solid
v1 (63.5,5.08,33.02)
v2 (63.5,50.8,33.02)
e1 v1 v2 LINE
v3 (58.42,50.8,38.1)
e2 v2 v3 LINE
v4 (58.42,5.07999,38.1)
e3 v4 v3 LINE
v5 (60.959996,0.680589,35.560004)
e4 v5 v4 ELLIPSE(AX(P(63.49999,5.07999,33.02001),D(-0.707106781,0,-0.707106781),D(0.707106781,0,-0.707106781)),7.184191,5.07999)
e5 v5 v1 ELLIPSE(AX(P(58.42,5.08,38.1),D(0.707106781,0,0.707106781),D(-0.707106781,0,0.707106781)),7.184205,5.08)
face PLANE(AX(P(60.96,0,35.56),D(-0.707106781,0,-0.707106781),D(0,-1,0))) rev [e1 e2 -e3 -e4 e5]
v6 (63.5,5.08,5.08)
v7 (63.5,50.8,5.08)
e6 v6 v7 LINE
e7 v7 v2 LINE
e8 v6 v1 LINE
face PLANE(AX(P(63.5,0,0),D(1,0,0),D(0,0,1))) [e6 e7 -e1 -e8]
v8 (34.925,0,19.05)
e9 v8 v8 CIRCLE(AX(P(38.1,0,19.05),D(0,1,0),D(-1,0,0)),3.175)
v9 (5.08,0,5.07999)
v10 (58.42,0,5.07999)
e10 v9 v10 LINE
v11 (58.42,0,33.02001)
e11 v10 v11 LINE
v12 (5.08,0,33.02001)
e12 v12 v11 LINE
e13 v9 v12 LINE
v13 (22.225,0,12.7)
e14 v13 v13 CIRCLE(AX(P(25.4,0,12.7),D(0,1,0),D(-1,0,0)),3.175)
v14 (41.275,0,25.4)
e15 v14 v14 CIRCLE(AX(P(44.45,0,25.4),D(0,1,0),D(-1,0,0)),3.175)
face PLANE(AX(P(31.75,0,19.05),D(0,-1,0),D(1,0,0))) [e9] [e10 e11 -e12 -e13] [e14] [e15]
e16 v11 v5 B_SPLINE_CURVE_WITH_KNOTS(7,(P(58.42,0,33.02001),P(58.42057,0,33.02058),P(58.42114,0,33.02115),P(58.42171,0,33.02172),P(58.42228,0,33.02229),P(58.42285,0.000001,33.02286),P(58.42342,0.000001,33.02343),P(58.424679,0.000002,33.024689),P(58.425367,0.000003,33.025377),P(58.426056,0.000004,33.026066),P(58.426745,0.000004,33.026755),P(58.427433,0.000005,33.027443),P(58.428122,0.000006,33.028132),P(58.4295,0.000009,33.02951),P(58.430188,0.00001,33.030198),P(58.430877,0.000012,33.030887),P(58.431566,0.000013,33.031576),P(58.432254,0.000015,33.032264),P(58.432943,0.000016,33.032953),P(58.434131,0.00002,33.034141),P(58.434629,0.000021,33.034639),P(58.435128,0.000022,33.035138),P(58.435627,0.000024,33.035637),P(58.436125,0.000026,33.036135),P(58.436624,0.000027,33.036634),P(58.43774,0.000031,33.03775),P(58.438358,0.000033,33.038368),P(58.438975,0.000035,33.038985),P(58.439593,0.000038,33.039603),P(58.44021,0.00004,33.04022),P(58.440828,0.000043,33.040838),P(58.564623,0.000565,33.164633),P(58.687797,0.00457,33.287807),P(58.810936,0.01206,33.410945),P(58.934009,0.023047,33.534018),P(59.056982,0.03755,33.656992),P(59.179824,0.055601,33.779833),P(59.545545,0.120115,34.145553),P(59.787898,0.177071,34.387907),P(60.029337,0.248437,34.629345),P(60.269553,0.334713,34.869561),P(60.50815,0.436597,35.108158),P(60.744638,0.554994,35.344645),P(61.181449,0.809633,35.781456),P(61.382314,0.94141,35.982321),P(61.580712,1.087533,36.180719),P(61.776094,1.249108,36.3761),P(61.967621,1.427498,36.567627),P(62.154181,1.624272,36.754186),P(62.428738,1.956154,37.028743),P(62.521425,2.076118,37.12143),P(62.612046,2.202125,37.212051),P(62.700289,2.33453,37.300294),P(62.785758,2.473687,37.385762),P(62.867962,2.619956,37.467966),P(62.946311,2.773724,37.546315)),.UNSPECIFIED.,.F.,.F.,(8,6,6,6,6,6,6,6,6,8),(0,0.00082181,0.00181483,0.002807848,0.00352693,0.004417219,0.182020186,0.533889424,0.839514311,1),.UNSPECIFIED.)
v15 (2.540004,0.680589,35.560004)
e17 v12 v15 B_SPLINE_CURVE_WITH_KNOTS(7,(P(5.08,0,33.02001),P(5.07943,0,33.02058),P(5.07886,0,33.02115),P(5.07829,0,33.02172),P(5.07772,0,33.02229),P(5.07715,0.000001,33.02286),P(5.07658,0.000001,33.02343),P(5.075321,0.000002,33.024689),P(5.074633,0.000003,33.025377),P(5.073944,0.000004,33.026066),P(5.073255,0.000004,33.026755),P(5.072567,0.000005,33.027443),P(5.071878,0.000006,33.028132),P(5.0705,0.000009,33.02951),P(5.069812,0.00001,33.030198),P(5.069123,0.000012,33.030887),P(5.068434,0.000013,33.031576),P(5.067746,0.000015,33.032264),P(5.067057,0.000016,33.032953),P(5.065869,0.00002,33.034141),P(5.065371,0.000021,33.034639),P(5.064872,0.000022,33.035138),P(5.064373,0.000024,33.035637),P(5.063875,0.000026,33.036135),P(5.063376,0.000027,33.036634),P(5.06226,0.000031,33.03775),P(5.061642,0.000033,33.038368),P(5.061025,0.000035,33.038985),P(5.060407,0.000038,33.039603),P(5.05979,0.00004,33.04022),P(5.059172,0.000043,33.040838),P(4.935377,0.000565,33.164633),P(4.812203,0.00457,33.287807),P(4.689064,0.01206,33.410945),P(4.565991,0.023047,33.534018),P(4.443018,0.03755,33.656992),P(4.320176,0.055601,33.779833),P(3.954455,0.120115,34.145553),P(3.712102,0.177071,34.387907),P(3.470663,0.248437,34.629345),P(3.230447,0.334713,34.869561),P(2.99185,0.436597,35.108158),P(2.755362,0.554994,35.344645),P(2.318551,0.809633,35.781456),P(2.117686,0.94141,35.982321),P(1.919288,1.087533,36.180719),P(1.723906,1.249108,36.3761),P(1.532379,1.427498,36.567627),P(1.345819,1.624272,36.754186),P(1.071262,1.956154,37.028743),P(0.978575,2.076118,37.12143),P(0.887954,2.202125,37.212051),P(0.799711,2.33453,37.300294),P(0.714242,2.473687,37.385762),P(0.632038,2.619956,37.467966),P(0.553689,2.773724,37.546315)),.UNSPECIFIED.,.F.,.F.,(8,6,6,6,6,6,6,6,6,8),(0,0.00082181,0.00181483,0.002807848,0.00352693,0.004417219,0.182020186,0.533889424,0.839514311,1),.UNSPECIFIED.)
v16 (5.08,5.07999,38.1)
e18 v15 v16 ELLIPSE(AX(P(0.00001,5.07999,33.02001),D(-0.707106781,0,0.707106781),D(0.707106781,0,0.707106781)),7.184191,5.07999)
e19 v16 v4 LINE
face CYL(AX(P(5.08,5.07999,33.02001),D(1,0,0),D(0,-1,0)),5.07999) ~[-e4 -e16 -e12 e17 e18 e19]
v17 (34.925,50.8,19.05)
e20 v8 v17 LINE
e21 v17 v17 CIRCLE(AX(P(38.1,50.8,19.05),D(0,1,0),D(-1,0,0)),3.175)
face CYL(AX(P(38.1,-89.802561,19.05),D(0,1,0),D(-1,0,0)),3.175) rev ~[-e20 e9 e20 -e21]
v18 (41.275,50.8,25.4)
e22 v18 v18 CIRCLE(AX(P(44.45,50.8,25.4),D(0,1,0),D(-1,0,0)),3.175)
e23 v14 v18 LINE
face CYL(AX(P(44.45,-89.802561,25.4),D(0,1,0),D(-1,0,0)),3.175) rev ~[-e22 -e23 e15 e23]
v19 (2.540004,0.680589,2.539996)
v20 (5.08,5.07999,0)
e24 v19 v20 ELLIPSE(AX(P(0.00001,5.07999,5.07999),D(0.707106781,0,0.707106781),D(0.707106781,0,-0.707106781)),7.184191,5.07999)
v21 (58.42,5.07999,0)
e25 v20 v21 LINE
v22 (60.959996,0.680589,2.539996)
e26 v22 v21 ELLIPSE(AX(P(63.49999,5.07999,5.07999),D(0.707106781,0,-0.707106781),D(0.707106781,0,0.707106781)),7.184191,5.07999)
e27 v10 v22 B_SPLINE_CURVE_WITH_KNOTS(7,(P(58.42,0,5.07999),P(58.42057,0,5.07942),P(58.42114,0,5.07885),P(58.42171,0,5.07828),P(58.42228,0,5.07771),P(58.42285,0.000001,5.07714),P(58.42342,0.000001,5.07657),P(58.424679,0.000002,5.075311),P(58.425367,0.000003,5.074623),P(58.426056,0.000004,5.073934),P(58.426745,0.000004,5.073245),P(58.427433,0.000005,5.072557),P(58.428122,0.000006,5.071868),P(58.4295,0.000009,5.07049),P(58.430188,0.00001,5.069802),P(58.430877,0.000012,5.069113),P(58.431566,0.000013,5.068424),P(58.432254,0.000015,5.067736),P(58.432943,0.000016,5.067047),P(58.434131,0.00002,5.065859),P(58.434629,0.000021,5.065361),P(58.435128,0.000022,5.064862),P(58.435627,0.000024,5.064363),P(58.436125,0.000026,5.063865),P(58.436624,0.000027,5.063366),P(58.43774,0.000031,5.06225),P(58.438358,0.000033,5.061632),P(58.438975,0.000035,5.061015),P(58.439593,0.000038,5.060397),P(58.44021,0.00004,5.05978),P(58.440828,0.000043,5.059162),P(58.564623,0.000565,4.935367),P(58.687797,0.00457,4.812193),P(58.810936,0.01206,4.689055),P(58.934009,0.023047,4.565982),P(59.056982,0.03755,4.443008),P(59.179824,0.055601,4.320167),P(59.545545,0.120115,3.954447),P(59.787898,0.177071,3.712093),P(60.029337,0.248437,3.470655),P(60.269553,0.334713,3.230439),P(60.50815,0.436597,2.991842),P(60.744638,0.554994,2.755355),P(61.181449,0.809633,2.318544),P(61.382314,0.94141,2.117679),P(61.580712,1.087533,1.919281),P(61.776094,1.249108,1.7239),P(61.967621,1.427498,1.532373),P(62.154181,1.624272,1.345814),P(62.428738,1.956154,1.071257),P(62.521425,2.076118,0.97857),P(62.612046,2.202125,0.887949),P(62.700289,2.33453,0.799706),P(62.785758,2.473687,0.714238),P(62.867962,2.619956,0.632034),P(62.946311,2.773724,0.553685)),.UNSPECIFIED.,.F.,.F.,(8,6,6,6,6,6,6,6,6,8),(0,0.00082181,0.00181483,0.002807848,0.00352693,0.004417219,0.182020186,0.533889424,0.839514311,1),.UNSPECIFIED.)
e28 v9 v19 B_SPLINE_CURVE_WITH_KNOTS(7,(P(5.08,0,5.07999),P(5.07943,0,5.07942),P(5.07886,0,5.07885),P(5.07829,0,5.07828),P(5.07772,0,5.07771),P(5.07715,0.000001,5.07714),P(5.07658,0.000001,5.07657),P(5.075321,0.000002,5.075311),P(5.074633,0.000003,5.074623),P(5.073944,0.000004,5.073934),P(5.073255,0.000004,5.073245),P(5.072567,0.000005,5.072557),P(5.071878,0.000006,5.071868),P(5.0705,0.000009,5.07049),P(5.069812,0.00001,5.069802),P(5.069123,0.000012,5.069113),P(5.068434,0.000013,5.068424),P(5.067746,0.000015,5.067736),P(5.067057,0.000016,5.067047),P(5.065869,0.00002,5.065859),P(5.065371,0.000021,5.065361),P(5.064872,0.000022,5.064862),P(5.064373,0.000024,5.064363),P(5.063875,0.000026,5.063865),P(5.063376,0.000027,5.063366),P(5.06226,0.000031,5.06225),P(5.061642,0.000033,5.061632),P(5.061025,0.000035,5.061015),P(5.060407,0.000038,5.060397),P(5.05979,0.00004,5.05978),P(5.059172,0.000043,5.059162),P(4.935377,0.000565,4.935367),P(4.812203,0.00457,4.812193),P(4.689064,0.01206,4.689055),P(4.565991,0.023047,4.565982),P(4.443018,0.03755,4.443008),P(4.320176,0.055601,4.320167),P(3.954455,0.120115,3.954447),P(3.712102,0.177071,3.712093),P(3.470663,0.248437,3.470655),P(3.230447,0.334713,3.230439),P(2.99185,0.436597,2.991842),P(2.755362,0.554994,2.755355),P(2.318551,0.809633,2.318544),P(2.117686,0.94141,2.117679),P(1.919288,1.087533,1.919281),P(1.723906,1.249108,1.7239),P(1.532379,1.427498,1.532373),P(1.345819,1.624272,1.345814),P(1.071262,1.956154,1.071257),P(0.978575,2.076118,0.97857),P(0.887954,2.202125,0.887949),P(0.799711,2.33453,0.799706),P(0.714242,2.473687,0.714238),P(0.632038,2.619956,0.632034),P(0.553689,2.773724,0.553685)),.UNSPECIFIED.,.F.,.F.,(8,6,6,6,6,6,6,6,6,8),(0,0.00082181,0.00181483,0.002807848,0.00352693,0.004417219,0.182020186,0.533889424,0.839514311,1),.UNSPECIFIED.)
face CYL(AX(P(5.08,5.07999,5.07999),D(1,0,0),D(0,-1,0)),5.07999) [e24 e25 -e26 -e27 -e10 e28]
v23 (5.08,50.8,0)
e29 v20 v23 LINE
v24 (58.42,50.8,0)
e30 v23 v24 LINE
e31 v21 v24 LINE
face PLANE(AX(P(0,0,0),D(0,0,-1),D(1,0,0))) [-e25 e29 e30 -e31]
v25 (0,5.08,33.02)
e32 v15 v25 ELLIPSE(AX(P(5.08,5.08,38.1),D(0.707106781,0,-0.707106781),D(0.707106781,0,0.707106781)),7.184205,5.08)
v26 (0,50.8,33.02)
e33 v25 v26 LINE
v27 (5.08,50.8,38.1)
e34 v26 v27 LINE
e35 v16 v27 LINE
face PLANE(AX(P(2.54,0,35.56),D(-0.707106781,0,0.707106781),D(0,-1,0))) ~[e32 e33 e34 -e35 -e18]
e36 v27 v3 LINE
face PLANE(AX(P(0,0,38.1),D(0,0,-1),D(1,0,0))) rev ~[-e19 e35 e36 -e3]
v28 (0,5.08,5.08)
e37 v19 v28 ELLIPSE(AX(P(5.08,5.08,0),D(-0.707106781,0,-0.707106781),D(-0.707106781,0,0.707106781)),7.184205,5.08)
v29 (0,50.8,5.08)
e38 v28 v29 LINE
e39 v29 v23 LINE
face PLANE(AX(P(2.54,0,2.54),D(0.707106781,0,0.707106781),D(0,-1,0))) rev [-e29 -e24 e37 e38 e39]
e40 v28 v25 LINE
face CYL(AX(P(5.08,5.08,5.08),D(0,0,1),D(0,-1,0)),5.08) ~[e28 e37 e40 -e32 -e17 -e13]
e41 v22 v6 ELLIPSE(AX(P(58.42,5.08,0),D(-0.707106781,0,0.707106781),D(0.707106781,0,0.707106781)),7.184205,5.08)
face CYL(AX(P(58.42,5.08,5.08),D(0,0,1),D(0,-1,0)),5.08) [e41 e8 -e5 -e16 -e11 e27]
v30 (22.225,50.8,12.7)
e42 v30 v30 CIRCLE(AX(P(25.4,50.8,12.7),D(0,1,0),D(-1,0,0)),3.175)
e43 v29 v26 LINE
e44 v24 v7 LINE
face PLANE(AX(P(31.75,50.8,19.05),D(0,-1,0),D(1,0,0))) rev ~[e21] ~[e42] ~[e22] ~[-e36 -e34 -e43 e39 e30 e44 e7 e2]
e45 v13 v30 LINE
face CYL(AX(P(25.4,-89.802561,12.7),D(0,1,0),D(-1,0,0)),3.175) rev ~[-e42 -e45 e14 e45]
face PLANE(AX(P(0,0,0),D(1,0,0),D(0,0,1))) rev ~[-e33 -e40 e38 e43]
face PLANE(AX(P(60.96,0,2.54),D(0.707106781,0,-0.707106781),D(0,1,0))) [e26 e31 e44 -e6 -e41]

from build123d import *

# Parameters (mm, degrees)
F0_W     = 63.5
F0_H     = 38.1
F1_DEPTH = 50.8
F2_SIZE  = 5.08
F3_R     = 5.08
F3_R_2   = 5.07999
F5_D     = 6.35


# Not quite as in the source:
# - a fillet or chamfer is up to 0.001 mm smaller than in the source, because OpenCascade refuses the exact size


with BuildPart() as f1:
    # F0 (on Front) → F1 (new body)
    with BuildSketch(Plane.XZ):
        with Locations((31.75, 19.05)):
            Rectangle(F0_W, F0_H)
    extrude(amount=-F1_DEPTH)

    # F2
    f2_edges = [f1.edges().sort_by_distance(p)[0] for p in [
        (63.5, 25.4, 38.1),
        (0, 25.4, 38.1),
        (63.5, 25.4, 0),
        (0, 25.4, 0),
    ]]
    chamfer(f2_edges, length=F2_SIZE)

    # F3 (call 1 of 4: OpenCascade refuses the feature's edges together)
    f3_edges = [f1.edges().sort_by_distance(p)[0] for p in [
        (63.5, 0, 19.05),
    ]]
    fillet(f3_edges, radius=F3_R)

    # F3#2 (call 2 of 4)
    f3_2_edges = [f1.edges().sort_by_distance(p)[0] for p in [
        (0, 0, 19.05),
    ]]
    fillet(f3_2_edges, radius=F3_R)

    # F3#3 (call 3 of 4) (radius 5.08 in the source; OpenCascade refuses exactly that, so slightly less here)
    f3_3_edges = [f1.edges().sort_by_distance(p)[0] for p in [
        (31.75, 0, 0),
    ]]
    fillet(f3_3_edges, radius=F3_R_2)

    # F3#4 (call 4 of 4) (radius 5.08 in the source; OpenCascade refuses exactly that, so slightly less here)
    f3_4_edges = [f1.edges().sort_by_distance(p)[0] for p in [
        (31.75, 0, 38.1),
    ]]
    fillet(f3_4_edges, radius=F3_R_2)

    # F5 (through all)
    with Locations(Plane.XZ):
        with Locations((25.4, 12.7), (44.45, 25.4), (38.1, 19.05)):
            Hole(F5_D / 2)


with BuildPart() as f6_1:
    # F6: copy of F1
    add(f1.part.moved(Location((50.8, 50.8, 50.8))))


solid = f1.part
